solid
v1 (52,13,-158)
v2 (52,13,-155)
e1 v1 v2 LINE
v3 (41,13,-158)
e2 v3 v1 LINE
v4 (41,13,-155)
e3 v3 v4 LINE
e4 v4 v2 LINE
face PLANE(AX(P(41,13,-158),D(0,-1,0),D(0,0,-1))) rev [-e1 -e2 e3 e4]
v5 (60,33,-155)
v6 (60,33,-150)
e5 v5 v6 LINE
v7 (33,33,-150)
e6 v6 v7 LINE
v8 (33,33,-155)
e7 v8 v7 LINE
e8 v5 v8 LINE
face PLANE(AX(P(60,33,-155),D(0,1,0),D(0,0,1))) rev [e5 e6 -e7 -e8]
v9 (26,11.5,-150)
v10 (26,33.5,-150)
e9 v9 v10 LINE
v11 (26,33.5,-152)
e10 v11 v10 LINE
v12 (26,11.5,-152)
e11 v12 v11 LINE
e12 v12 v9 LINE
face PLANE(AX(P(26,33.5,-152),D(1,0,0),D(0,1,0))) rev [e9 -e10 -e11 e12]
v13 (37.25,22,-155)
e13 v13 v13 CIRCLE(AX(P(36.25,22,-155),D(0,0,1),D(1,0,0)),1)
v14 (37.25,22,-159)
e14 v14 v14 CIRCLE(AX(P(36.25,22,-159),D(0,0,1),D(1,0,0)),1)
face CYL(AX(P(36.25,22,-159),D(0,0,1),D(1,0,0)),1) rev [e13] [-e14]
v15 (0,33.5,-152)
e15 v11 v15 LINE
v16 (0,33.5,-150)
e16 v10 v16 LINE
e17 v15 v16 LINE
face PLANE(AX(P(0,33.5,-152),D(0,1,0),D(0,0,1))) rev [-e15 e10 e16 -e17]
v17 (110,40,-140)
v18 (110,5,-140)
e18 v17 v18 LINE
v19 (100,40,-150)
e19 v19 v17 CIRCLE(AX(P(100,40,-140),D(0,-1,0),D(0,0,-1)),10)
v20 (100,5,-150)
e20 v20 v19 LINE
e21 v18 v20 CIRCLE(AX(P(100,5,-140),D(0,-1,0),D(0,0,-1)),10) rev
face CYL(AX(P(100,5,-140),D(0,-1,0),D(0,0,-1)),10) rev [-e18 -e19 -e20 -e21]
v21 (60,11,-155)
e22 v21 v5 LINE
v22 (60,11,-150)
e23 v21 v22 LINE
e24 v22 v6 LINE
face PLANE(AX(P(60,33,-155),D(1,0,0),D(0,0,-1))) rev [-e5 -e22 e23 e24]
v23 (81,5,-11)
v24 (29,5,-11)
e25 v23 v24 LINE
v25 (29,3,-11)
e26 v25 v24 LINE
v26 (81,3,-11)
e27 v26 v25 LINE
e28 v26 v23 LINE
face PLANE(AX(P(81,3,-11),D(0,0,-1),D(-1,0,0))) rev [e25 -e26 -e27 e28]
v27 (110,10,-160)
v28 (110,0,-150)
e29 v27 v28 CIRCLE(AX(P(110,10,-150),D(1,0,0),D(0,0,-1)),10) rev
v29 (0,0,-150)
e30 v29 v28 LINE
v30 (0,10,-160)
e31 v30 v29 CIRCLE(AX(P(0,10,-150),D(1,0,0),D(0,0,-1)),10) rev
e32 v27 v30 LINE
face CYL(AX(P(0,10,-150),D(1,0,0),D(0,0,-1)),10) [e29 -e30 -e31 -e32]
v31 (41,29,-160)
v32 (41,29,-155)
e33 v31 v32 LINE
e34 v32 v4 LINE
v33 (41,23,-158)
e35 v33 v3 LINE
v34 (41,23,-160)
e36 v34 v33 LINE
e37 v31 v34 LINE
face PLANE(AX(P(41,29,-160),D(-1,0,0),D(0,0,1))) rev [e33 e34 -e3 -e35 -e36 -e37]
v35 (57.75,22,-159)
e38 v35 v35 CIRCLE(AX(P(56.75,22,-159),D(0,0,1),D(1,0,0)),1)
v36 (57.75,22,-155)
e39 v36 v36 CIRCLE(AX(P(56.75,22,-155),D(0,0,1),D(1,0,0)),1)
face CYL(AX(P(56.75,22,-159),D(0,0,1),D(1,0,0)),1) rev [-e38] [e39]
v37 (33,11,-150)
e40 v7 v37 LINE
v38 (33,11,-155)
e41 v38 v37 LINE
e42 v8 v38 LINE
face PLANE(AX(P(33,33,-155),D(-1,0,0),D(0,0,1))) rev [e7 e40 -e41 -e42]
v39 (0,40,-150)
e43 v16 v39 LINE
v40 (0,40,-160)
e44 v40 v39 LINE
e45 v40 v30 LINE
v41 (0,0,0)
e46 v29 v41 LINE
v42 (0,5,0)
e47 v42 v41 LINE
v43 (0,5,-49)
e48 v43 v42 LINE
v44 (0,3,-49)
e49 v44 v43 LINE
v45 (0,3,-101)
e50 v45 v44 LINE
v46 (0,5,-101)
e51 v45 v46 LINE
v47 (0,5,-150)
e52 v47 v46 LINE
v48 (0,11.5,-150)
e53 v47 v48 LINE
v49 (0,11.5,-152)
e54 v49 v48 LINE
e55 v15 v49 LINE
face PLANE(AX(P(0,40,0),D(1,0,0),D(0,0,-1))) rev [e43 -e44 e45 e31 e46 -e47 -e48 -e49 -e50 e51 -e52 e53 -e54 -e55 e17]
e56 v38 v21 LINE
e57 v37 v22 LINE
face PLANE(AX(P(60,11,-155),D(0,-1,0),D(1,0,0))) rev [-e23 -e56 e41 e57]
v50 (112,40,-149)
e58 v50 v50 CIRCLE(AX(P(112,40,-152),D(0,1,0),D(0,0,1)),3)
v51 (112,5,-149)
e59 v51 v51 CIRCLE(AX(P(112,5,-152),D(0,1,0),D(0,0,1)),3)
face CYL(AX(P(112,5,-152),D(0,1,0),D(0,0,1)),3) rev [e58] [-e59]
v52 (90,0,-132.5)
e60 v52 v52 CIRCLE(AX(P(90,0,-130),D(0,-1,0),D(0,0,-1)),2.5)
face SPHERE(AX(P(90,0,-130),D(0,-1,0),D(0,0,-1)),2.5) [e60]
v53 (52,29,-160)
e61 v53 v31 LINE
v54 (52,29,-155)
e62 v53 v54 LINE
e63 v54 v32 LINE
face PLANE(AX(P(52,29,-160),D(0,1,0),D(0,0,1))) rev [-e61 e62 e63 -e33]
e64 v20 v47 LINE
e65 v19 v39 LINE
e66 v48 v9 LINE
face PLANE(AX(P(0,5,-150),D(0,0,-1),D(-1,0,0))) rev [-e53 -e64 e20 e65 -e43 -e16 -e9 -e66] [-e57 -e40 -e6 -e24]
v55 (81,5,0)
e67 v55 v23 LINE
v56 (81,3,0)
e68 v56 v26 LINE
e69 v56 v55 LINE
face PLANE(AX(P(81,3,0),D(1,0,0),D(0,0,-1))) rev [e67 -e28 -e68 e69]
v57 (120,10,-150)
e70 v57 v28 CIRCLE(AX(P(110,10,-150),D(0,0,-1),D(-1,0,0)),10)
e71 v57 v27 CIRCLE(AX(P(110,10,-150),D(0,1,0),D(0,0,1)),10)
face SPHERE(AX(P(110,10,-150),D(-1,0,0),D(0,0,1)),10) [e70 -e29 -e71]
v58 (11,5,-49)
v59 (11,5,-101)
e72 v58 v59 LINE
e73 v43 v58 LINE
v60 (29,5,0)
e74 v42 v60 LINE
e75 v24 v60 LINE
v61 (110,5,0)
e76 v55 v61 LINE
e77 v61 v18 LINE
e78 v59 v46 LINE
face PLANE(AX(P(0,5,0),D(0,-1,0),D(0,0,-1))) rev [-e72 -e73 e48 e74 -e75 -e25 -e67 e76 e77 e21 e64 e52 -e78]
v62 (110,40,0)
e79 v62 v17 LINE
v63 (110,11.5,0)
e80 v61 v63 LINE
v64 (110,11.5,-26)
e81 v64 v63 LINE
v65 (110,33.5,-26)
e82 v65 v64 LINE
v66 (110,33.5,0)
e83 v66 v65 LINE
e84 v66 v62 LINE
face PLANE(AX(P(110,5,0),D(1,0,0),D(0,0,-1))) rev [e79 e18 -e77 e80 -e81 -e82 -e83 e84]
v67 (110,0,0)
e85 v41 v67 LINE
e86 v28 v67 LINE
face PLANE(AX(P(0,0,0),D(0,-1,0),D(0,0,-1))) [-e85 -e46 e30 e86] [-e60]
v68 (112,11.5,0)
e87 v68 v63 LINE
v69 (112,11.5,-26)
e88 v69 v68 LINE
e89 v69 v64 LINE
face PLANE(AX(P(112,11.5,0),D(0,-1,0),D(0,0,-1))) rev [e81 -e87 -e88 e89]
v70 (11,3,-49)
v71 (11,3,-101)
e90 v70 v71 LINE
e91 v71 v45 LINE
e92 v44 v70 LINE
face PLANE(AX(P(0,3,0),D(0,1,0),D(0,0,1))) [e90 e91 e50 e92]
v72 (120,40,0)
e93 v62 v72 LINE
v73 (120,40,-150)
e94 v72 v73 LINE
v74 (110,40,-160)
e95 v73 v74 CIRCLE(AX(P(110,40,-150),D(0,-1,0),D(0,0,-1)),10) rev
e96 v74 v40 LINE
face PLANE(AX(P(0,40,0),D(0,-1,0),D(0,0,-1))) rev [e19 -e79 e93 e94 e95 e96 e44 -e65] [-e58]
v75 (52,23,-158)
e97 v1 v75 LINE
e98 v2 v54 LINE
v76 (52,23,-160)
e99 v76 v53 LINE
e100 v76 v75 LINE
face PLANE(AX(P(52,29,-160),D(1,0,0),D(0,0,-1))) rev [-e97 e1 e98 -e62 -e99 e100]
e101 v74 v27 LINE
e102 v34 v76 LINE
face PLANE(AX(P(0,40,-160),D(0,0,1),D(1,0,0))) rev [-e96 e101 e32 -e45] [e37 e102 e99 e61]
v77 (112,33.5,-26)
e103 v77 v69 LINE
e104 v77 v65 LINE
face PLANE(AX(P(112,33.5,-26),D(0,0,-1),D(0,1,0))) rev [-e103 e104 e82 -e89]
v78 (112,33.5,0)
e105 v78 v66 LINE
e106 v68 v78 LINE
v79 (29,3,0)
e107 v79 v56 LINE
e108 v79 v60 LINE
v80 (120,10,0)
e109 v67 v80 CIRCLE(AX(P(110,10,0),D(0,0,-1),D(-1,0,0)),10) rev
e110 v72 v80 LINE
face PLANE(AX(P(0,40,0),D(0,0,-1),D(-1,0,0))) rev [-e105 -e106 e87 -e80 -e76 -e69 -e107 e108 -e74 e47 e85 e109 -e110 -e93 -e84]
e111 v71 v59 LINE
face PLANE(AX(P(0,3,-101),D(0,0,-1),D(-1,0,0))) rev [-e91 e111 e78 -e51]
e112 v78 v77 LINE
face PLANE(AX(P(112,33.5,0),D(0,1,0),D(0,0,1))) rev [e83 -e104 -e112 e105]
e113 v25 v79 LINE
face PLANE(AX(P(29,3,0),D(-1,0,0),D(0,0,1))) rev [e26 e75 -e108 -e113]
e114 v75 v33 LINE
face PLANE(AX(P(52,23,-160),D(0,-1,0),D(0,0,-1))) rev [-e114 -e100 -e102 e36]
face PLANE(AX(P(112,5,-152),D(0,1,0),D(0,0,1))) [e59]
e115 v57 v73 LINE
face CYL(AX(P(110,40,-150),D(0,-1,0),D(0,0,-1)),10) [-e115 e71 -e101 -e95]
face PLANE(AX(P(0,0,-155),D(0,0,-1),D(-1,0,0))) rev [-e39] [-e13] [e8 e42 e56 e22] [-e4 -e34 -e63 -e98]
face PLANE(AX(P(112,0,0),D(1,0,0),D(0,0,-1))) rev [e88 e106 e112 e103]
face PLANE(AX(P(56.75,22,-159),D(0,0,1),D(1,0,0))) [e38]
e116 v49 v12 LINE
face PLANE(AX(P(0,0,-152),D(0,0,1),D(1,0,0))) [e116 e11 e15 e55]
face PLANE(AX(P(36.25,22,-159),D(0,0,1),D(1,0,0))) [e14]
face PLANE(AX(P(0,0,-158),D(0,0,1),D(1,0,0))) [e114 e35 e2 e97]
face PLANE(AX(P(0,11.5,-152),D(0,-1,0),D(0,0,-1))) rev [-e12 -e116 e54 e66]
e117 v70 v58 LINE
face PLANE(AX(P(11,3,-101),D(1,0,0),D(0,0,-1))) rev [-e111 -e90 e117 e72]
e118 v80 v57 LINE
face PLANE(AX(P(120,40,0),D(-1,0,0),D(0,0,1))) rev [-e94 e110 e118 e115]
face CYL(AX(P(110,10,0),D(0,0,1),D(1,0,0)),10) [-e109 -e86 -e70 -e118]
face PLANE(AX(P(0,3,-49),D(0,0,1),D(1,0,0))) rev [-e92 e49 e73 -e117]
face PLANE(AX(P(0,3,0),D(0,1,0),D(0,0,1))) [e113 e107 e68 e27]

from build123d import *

# Parameters (mm, degrees)
ESQUISSE1_W             = 120
ESQUISSE1_H             = 160
BOSS_EXTRU_1_DEPTH      = 40
CONG_1_R                = 10
CONG_2_R                = 10
ESQUISSE2_W             = 110
ESQUISSE2_H             = 150
ENL_V_MAT_EXTRU_1_DEPTH = 35
CONG_3_R                = 10
ESQUISSE3_R             = 3
ENL_V_MAT_EXTRU_2_DEPTH = 35
ESQUISSE4_R             = 2.5
BOSS_EXTRU_2_DEPTH      = 2.5
CONG_4_R                = 2.5
ESQUISSE5_W             = 11
ESQUISSE5_H             = 52
ESQUISSE5_W_2           = 52
ESQUISSE5_H_2           = 11
ENL_V_MAT_EXTRU_3_DEPTH = 2
ESQUISSE6_W             = 26
ESQUISSE6_H             = 22
ENL_V_MAT_EXTRU_4_DEPTH = 2
ESQUISSE7_W             = 26
ESQUISSE7_H             = 22
ENL_V_MAT_EXTRU_5_DEPTH = 2
ESQUISSE8_W             = 27
ESQUISSE8_H             = 22
ENL_V_MAT_EXTRU_6_DEPTH = 5
ESQUISSE9_R             = 1
ENL_V_MAT_EXTRU_7_DEPTH = 4
ESQUISSE10_W            = 11
ESQUISSE10_H            = 6
ENL_V_MAT_EXTRU_8_DEPTH = 201.062490237
ESQUISSE11_W            = 11
ESQUISSE11_H            = 10
ENL_V_MAT_EXTRU_9_DEPTH = 3


with BuildPart() as part:
    # Esquisse1 → Boss.-Extru.1 (new body)
    with BuildSketch(Plane(origin=(0, 0, 0), x_dir=(1, 0, 0), z_dir=(0, 1, 0))):
        with Locations((60, 80)):
            Rectangle(ESQUISSE1_W, ESQUISSE1_H)
    extrude(amount=BOSS_EXTRU_1_DEPTH)

    # Congé1
    cong_1_edges = [part.edges().sort_by_distance(p)[0] for p in [
        (60, 0, -160),
    ]]
    fillet(cong_1_edges, radius=CONG_1_R)

    # Congé2
    cong_2_edges = [part.edges().sort_by_distance(p)[0] for p in [
        (120, 2.928932188, -157.071067812),
        (120, 0, -75),
        (120, 25, -160),
    ]]
    fillet(cong_2_edges, radius=CONG_2_R)

    # Esquisse2 → Enlèv. mat.-Extru.1 (cut)
    with BuildSketch(Plane(origin=(0, 40, 0), x_dir=(1, 0, 0), z_dir=(0, 1, 0))):
        with Locations((55, 75)):
            Rectangle(ESQUISSE2_W, ESQUISSE2_H)
    extrude(amount=-ENL_V_MAT_EXTRU_1_DEPTH, mode=Mode.SUBTRACT)

    # Congé3
    cong_3_edges = [part.edges().sort_by_distance(p)[0] for p in [
        (110, 22.5, -150),
    ]]
    fillet(cong_3_edges, radius=CONG_3_R)

    # Esquisse3 → Enlèv. mat.-Extru.2 (cut)
    with BuildSketch(Plane(origin=(0, 40, 0), x_dir=(1, 0, 0), z_dir=(0, 1, 0))):
        with Locations(Location((112, 152, 0), (0, 0, 270))):
            Circle(ESQUISSE3_R)
    extrude(amount=-ENL_V_MAT_EXTRU_2_DEPTH, mode=Mode.SUBTRACT)

    # Esquisse4 → Boss.-Extru.2 (add)
    with BuildSketch(Plane.XZ):
        with Locations(Location((90, -130, 0), (0, 0, 270))):
            Circle(ESQUISSE4_R)
    extrude(amount=BOSS_EXTRU_2_DEPTH)

    # Congé4
    cong_4_edges = [part.edges().sort_by_distance(p)[0] for p in [
        (90, -2.5, -127.5),
    ]]
    fillet(cong_4_edges, radius=CONG_4_R - 0.0001)  # a hair under: the kernel refuses the full size

    # Esquisse5 → Enlèv. mat.-Extru.3 (cut)
    with BuildSketch(Plane(origin=(0, 5, 0), x_dir=(1, 0, 0), z_dir=(0, 1, 0))):
        with Locations((5.5, 75)):
            Rectangle(ESQUISSE5_W, ESQUISSE5_H)
        with Locations((55, 5.5)):
            Rectangle(ESQUISSE5_W_2, ESQUISSE5_H_2)
    extrude(amount=-ENL_V_MAT_EXTRU_3_DEPTH, mode=Mode.SUBTRACT)

    # Esquisse6 → Enlèv. mat.-Extru.4 (cut)
    with BuildSketch(Plane.XY.offset(-150)):
        with Locations((13, 22.5)):
            Rectangle(ESQUISSE6_W, ESQUISSE6_H)
    extrude(amount=-ENL_V_MAT_EXTRU_4_DEPTH, mode=Mode.SUBTRACT)

    # Esquisse7 → Enlèv. mat.-Extru.5 (cut)
    with BuildSketch(Plane.ZY.offset(-110)):
        with Locations((-13, 22.5)):
            Rectangle(ESQUISSE7_W, ESQUISSE7_H)
    extrude(amount=-ENL_V_MAT_EXTRU_5_DEPTH, mode=Mode.SUBTRACT)

    # Esquisse8 → Enlèv. mat.-Extru.6 (cut)
    with BuildSketch(Plane.XY.offset(-150)):
        with Locations((46.5, 22)):
            Rectangle(ESQUISSE8_W, ESQUISSE8_H)
    extrude(amount=-ENL_V_MAT_EXTRU_6_DEPTH, mode=Mode.SUBTRACT)

    # Esquisse9 → Enlèv. mat.-Extru.7 (cut)
    with BuildSketch(Plane.XY.offset(-155)):
        with Locations((56.75, 22)):
            Circle(ESQUISSE9_R)
        with Locations((36.25, 22)):
            Circle(ESQUISSE9_R)
    extrude(amount=-ENL_V_MAT_EXTRU_7_DEPTH, mode=Mode.SUBTRACT)

    # Esquisse10 → Enlèv. mat.-Extru.8 (cut, through all)
    with BuildSketch(Plane.XY.offset(-155)):
        with Locations((46.5, 26)):
            Rectangle(ESQUISSE10_W, ESQUISSE10_H)
    extrude(amount=-ENL_V_MAT_EXTRU_8_DEPTH, mode=Mode.SUBTRACT)

    # Esquisse11 → Enlèv. mat.-Extru.9 (cut)
    with BuildSketch(Plane.XY.offset(-155)):
        with Locations((46.5, 18)):
            Rectangle(ESQUISSE11_W, ESQUISSE11_H)
    extrude(amount=-ENL_V_MAT_EXTRU_9_DEPTH, mode=Mode.SUBTRACT)


solid = part.part
